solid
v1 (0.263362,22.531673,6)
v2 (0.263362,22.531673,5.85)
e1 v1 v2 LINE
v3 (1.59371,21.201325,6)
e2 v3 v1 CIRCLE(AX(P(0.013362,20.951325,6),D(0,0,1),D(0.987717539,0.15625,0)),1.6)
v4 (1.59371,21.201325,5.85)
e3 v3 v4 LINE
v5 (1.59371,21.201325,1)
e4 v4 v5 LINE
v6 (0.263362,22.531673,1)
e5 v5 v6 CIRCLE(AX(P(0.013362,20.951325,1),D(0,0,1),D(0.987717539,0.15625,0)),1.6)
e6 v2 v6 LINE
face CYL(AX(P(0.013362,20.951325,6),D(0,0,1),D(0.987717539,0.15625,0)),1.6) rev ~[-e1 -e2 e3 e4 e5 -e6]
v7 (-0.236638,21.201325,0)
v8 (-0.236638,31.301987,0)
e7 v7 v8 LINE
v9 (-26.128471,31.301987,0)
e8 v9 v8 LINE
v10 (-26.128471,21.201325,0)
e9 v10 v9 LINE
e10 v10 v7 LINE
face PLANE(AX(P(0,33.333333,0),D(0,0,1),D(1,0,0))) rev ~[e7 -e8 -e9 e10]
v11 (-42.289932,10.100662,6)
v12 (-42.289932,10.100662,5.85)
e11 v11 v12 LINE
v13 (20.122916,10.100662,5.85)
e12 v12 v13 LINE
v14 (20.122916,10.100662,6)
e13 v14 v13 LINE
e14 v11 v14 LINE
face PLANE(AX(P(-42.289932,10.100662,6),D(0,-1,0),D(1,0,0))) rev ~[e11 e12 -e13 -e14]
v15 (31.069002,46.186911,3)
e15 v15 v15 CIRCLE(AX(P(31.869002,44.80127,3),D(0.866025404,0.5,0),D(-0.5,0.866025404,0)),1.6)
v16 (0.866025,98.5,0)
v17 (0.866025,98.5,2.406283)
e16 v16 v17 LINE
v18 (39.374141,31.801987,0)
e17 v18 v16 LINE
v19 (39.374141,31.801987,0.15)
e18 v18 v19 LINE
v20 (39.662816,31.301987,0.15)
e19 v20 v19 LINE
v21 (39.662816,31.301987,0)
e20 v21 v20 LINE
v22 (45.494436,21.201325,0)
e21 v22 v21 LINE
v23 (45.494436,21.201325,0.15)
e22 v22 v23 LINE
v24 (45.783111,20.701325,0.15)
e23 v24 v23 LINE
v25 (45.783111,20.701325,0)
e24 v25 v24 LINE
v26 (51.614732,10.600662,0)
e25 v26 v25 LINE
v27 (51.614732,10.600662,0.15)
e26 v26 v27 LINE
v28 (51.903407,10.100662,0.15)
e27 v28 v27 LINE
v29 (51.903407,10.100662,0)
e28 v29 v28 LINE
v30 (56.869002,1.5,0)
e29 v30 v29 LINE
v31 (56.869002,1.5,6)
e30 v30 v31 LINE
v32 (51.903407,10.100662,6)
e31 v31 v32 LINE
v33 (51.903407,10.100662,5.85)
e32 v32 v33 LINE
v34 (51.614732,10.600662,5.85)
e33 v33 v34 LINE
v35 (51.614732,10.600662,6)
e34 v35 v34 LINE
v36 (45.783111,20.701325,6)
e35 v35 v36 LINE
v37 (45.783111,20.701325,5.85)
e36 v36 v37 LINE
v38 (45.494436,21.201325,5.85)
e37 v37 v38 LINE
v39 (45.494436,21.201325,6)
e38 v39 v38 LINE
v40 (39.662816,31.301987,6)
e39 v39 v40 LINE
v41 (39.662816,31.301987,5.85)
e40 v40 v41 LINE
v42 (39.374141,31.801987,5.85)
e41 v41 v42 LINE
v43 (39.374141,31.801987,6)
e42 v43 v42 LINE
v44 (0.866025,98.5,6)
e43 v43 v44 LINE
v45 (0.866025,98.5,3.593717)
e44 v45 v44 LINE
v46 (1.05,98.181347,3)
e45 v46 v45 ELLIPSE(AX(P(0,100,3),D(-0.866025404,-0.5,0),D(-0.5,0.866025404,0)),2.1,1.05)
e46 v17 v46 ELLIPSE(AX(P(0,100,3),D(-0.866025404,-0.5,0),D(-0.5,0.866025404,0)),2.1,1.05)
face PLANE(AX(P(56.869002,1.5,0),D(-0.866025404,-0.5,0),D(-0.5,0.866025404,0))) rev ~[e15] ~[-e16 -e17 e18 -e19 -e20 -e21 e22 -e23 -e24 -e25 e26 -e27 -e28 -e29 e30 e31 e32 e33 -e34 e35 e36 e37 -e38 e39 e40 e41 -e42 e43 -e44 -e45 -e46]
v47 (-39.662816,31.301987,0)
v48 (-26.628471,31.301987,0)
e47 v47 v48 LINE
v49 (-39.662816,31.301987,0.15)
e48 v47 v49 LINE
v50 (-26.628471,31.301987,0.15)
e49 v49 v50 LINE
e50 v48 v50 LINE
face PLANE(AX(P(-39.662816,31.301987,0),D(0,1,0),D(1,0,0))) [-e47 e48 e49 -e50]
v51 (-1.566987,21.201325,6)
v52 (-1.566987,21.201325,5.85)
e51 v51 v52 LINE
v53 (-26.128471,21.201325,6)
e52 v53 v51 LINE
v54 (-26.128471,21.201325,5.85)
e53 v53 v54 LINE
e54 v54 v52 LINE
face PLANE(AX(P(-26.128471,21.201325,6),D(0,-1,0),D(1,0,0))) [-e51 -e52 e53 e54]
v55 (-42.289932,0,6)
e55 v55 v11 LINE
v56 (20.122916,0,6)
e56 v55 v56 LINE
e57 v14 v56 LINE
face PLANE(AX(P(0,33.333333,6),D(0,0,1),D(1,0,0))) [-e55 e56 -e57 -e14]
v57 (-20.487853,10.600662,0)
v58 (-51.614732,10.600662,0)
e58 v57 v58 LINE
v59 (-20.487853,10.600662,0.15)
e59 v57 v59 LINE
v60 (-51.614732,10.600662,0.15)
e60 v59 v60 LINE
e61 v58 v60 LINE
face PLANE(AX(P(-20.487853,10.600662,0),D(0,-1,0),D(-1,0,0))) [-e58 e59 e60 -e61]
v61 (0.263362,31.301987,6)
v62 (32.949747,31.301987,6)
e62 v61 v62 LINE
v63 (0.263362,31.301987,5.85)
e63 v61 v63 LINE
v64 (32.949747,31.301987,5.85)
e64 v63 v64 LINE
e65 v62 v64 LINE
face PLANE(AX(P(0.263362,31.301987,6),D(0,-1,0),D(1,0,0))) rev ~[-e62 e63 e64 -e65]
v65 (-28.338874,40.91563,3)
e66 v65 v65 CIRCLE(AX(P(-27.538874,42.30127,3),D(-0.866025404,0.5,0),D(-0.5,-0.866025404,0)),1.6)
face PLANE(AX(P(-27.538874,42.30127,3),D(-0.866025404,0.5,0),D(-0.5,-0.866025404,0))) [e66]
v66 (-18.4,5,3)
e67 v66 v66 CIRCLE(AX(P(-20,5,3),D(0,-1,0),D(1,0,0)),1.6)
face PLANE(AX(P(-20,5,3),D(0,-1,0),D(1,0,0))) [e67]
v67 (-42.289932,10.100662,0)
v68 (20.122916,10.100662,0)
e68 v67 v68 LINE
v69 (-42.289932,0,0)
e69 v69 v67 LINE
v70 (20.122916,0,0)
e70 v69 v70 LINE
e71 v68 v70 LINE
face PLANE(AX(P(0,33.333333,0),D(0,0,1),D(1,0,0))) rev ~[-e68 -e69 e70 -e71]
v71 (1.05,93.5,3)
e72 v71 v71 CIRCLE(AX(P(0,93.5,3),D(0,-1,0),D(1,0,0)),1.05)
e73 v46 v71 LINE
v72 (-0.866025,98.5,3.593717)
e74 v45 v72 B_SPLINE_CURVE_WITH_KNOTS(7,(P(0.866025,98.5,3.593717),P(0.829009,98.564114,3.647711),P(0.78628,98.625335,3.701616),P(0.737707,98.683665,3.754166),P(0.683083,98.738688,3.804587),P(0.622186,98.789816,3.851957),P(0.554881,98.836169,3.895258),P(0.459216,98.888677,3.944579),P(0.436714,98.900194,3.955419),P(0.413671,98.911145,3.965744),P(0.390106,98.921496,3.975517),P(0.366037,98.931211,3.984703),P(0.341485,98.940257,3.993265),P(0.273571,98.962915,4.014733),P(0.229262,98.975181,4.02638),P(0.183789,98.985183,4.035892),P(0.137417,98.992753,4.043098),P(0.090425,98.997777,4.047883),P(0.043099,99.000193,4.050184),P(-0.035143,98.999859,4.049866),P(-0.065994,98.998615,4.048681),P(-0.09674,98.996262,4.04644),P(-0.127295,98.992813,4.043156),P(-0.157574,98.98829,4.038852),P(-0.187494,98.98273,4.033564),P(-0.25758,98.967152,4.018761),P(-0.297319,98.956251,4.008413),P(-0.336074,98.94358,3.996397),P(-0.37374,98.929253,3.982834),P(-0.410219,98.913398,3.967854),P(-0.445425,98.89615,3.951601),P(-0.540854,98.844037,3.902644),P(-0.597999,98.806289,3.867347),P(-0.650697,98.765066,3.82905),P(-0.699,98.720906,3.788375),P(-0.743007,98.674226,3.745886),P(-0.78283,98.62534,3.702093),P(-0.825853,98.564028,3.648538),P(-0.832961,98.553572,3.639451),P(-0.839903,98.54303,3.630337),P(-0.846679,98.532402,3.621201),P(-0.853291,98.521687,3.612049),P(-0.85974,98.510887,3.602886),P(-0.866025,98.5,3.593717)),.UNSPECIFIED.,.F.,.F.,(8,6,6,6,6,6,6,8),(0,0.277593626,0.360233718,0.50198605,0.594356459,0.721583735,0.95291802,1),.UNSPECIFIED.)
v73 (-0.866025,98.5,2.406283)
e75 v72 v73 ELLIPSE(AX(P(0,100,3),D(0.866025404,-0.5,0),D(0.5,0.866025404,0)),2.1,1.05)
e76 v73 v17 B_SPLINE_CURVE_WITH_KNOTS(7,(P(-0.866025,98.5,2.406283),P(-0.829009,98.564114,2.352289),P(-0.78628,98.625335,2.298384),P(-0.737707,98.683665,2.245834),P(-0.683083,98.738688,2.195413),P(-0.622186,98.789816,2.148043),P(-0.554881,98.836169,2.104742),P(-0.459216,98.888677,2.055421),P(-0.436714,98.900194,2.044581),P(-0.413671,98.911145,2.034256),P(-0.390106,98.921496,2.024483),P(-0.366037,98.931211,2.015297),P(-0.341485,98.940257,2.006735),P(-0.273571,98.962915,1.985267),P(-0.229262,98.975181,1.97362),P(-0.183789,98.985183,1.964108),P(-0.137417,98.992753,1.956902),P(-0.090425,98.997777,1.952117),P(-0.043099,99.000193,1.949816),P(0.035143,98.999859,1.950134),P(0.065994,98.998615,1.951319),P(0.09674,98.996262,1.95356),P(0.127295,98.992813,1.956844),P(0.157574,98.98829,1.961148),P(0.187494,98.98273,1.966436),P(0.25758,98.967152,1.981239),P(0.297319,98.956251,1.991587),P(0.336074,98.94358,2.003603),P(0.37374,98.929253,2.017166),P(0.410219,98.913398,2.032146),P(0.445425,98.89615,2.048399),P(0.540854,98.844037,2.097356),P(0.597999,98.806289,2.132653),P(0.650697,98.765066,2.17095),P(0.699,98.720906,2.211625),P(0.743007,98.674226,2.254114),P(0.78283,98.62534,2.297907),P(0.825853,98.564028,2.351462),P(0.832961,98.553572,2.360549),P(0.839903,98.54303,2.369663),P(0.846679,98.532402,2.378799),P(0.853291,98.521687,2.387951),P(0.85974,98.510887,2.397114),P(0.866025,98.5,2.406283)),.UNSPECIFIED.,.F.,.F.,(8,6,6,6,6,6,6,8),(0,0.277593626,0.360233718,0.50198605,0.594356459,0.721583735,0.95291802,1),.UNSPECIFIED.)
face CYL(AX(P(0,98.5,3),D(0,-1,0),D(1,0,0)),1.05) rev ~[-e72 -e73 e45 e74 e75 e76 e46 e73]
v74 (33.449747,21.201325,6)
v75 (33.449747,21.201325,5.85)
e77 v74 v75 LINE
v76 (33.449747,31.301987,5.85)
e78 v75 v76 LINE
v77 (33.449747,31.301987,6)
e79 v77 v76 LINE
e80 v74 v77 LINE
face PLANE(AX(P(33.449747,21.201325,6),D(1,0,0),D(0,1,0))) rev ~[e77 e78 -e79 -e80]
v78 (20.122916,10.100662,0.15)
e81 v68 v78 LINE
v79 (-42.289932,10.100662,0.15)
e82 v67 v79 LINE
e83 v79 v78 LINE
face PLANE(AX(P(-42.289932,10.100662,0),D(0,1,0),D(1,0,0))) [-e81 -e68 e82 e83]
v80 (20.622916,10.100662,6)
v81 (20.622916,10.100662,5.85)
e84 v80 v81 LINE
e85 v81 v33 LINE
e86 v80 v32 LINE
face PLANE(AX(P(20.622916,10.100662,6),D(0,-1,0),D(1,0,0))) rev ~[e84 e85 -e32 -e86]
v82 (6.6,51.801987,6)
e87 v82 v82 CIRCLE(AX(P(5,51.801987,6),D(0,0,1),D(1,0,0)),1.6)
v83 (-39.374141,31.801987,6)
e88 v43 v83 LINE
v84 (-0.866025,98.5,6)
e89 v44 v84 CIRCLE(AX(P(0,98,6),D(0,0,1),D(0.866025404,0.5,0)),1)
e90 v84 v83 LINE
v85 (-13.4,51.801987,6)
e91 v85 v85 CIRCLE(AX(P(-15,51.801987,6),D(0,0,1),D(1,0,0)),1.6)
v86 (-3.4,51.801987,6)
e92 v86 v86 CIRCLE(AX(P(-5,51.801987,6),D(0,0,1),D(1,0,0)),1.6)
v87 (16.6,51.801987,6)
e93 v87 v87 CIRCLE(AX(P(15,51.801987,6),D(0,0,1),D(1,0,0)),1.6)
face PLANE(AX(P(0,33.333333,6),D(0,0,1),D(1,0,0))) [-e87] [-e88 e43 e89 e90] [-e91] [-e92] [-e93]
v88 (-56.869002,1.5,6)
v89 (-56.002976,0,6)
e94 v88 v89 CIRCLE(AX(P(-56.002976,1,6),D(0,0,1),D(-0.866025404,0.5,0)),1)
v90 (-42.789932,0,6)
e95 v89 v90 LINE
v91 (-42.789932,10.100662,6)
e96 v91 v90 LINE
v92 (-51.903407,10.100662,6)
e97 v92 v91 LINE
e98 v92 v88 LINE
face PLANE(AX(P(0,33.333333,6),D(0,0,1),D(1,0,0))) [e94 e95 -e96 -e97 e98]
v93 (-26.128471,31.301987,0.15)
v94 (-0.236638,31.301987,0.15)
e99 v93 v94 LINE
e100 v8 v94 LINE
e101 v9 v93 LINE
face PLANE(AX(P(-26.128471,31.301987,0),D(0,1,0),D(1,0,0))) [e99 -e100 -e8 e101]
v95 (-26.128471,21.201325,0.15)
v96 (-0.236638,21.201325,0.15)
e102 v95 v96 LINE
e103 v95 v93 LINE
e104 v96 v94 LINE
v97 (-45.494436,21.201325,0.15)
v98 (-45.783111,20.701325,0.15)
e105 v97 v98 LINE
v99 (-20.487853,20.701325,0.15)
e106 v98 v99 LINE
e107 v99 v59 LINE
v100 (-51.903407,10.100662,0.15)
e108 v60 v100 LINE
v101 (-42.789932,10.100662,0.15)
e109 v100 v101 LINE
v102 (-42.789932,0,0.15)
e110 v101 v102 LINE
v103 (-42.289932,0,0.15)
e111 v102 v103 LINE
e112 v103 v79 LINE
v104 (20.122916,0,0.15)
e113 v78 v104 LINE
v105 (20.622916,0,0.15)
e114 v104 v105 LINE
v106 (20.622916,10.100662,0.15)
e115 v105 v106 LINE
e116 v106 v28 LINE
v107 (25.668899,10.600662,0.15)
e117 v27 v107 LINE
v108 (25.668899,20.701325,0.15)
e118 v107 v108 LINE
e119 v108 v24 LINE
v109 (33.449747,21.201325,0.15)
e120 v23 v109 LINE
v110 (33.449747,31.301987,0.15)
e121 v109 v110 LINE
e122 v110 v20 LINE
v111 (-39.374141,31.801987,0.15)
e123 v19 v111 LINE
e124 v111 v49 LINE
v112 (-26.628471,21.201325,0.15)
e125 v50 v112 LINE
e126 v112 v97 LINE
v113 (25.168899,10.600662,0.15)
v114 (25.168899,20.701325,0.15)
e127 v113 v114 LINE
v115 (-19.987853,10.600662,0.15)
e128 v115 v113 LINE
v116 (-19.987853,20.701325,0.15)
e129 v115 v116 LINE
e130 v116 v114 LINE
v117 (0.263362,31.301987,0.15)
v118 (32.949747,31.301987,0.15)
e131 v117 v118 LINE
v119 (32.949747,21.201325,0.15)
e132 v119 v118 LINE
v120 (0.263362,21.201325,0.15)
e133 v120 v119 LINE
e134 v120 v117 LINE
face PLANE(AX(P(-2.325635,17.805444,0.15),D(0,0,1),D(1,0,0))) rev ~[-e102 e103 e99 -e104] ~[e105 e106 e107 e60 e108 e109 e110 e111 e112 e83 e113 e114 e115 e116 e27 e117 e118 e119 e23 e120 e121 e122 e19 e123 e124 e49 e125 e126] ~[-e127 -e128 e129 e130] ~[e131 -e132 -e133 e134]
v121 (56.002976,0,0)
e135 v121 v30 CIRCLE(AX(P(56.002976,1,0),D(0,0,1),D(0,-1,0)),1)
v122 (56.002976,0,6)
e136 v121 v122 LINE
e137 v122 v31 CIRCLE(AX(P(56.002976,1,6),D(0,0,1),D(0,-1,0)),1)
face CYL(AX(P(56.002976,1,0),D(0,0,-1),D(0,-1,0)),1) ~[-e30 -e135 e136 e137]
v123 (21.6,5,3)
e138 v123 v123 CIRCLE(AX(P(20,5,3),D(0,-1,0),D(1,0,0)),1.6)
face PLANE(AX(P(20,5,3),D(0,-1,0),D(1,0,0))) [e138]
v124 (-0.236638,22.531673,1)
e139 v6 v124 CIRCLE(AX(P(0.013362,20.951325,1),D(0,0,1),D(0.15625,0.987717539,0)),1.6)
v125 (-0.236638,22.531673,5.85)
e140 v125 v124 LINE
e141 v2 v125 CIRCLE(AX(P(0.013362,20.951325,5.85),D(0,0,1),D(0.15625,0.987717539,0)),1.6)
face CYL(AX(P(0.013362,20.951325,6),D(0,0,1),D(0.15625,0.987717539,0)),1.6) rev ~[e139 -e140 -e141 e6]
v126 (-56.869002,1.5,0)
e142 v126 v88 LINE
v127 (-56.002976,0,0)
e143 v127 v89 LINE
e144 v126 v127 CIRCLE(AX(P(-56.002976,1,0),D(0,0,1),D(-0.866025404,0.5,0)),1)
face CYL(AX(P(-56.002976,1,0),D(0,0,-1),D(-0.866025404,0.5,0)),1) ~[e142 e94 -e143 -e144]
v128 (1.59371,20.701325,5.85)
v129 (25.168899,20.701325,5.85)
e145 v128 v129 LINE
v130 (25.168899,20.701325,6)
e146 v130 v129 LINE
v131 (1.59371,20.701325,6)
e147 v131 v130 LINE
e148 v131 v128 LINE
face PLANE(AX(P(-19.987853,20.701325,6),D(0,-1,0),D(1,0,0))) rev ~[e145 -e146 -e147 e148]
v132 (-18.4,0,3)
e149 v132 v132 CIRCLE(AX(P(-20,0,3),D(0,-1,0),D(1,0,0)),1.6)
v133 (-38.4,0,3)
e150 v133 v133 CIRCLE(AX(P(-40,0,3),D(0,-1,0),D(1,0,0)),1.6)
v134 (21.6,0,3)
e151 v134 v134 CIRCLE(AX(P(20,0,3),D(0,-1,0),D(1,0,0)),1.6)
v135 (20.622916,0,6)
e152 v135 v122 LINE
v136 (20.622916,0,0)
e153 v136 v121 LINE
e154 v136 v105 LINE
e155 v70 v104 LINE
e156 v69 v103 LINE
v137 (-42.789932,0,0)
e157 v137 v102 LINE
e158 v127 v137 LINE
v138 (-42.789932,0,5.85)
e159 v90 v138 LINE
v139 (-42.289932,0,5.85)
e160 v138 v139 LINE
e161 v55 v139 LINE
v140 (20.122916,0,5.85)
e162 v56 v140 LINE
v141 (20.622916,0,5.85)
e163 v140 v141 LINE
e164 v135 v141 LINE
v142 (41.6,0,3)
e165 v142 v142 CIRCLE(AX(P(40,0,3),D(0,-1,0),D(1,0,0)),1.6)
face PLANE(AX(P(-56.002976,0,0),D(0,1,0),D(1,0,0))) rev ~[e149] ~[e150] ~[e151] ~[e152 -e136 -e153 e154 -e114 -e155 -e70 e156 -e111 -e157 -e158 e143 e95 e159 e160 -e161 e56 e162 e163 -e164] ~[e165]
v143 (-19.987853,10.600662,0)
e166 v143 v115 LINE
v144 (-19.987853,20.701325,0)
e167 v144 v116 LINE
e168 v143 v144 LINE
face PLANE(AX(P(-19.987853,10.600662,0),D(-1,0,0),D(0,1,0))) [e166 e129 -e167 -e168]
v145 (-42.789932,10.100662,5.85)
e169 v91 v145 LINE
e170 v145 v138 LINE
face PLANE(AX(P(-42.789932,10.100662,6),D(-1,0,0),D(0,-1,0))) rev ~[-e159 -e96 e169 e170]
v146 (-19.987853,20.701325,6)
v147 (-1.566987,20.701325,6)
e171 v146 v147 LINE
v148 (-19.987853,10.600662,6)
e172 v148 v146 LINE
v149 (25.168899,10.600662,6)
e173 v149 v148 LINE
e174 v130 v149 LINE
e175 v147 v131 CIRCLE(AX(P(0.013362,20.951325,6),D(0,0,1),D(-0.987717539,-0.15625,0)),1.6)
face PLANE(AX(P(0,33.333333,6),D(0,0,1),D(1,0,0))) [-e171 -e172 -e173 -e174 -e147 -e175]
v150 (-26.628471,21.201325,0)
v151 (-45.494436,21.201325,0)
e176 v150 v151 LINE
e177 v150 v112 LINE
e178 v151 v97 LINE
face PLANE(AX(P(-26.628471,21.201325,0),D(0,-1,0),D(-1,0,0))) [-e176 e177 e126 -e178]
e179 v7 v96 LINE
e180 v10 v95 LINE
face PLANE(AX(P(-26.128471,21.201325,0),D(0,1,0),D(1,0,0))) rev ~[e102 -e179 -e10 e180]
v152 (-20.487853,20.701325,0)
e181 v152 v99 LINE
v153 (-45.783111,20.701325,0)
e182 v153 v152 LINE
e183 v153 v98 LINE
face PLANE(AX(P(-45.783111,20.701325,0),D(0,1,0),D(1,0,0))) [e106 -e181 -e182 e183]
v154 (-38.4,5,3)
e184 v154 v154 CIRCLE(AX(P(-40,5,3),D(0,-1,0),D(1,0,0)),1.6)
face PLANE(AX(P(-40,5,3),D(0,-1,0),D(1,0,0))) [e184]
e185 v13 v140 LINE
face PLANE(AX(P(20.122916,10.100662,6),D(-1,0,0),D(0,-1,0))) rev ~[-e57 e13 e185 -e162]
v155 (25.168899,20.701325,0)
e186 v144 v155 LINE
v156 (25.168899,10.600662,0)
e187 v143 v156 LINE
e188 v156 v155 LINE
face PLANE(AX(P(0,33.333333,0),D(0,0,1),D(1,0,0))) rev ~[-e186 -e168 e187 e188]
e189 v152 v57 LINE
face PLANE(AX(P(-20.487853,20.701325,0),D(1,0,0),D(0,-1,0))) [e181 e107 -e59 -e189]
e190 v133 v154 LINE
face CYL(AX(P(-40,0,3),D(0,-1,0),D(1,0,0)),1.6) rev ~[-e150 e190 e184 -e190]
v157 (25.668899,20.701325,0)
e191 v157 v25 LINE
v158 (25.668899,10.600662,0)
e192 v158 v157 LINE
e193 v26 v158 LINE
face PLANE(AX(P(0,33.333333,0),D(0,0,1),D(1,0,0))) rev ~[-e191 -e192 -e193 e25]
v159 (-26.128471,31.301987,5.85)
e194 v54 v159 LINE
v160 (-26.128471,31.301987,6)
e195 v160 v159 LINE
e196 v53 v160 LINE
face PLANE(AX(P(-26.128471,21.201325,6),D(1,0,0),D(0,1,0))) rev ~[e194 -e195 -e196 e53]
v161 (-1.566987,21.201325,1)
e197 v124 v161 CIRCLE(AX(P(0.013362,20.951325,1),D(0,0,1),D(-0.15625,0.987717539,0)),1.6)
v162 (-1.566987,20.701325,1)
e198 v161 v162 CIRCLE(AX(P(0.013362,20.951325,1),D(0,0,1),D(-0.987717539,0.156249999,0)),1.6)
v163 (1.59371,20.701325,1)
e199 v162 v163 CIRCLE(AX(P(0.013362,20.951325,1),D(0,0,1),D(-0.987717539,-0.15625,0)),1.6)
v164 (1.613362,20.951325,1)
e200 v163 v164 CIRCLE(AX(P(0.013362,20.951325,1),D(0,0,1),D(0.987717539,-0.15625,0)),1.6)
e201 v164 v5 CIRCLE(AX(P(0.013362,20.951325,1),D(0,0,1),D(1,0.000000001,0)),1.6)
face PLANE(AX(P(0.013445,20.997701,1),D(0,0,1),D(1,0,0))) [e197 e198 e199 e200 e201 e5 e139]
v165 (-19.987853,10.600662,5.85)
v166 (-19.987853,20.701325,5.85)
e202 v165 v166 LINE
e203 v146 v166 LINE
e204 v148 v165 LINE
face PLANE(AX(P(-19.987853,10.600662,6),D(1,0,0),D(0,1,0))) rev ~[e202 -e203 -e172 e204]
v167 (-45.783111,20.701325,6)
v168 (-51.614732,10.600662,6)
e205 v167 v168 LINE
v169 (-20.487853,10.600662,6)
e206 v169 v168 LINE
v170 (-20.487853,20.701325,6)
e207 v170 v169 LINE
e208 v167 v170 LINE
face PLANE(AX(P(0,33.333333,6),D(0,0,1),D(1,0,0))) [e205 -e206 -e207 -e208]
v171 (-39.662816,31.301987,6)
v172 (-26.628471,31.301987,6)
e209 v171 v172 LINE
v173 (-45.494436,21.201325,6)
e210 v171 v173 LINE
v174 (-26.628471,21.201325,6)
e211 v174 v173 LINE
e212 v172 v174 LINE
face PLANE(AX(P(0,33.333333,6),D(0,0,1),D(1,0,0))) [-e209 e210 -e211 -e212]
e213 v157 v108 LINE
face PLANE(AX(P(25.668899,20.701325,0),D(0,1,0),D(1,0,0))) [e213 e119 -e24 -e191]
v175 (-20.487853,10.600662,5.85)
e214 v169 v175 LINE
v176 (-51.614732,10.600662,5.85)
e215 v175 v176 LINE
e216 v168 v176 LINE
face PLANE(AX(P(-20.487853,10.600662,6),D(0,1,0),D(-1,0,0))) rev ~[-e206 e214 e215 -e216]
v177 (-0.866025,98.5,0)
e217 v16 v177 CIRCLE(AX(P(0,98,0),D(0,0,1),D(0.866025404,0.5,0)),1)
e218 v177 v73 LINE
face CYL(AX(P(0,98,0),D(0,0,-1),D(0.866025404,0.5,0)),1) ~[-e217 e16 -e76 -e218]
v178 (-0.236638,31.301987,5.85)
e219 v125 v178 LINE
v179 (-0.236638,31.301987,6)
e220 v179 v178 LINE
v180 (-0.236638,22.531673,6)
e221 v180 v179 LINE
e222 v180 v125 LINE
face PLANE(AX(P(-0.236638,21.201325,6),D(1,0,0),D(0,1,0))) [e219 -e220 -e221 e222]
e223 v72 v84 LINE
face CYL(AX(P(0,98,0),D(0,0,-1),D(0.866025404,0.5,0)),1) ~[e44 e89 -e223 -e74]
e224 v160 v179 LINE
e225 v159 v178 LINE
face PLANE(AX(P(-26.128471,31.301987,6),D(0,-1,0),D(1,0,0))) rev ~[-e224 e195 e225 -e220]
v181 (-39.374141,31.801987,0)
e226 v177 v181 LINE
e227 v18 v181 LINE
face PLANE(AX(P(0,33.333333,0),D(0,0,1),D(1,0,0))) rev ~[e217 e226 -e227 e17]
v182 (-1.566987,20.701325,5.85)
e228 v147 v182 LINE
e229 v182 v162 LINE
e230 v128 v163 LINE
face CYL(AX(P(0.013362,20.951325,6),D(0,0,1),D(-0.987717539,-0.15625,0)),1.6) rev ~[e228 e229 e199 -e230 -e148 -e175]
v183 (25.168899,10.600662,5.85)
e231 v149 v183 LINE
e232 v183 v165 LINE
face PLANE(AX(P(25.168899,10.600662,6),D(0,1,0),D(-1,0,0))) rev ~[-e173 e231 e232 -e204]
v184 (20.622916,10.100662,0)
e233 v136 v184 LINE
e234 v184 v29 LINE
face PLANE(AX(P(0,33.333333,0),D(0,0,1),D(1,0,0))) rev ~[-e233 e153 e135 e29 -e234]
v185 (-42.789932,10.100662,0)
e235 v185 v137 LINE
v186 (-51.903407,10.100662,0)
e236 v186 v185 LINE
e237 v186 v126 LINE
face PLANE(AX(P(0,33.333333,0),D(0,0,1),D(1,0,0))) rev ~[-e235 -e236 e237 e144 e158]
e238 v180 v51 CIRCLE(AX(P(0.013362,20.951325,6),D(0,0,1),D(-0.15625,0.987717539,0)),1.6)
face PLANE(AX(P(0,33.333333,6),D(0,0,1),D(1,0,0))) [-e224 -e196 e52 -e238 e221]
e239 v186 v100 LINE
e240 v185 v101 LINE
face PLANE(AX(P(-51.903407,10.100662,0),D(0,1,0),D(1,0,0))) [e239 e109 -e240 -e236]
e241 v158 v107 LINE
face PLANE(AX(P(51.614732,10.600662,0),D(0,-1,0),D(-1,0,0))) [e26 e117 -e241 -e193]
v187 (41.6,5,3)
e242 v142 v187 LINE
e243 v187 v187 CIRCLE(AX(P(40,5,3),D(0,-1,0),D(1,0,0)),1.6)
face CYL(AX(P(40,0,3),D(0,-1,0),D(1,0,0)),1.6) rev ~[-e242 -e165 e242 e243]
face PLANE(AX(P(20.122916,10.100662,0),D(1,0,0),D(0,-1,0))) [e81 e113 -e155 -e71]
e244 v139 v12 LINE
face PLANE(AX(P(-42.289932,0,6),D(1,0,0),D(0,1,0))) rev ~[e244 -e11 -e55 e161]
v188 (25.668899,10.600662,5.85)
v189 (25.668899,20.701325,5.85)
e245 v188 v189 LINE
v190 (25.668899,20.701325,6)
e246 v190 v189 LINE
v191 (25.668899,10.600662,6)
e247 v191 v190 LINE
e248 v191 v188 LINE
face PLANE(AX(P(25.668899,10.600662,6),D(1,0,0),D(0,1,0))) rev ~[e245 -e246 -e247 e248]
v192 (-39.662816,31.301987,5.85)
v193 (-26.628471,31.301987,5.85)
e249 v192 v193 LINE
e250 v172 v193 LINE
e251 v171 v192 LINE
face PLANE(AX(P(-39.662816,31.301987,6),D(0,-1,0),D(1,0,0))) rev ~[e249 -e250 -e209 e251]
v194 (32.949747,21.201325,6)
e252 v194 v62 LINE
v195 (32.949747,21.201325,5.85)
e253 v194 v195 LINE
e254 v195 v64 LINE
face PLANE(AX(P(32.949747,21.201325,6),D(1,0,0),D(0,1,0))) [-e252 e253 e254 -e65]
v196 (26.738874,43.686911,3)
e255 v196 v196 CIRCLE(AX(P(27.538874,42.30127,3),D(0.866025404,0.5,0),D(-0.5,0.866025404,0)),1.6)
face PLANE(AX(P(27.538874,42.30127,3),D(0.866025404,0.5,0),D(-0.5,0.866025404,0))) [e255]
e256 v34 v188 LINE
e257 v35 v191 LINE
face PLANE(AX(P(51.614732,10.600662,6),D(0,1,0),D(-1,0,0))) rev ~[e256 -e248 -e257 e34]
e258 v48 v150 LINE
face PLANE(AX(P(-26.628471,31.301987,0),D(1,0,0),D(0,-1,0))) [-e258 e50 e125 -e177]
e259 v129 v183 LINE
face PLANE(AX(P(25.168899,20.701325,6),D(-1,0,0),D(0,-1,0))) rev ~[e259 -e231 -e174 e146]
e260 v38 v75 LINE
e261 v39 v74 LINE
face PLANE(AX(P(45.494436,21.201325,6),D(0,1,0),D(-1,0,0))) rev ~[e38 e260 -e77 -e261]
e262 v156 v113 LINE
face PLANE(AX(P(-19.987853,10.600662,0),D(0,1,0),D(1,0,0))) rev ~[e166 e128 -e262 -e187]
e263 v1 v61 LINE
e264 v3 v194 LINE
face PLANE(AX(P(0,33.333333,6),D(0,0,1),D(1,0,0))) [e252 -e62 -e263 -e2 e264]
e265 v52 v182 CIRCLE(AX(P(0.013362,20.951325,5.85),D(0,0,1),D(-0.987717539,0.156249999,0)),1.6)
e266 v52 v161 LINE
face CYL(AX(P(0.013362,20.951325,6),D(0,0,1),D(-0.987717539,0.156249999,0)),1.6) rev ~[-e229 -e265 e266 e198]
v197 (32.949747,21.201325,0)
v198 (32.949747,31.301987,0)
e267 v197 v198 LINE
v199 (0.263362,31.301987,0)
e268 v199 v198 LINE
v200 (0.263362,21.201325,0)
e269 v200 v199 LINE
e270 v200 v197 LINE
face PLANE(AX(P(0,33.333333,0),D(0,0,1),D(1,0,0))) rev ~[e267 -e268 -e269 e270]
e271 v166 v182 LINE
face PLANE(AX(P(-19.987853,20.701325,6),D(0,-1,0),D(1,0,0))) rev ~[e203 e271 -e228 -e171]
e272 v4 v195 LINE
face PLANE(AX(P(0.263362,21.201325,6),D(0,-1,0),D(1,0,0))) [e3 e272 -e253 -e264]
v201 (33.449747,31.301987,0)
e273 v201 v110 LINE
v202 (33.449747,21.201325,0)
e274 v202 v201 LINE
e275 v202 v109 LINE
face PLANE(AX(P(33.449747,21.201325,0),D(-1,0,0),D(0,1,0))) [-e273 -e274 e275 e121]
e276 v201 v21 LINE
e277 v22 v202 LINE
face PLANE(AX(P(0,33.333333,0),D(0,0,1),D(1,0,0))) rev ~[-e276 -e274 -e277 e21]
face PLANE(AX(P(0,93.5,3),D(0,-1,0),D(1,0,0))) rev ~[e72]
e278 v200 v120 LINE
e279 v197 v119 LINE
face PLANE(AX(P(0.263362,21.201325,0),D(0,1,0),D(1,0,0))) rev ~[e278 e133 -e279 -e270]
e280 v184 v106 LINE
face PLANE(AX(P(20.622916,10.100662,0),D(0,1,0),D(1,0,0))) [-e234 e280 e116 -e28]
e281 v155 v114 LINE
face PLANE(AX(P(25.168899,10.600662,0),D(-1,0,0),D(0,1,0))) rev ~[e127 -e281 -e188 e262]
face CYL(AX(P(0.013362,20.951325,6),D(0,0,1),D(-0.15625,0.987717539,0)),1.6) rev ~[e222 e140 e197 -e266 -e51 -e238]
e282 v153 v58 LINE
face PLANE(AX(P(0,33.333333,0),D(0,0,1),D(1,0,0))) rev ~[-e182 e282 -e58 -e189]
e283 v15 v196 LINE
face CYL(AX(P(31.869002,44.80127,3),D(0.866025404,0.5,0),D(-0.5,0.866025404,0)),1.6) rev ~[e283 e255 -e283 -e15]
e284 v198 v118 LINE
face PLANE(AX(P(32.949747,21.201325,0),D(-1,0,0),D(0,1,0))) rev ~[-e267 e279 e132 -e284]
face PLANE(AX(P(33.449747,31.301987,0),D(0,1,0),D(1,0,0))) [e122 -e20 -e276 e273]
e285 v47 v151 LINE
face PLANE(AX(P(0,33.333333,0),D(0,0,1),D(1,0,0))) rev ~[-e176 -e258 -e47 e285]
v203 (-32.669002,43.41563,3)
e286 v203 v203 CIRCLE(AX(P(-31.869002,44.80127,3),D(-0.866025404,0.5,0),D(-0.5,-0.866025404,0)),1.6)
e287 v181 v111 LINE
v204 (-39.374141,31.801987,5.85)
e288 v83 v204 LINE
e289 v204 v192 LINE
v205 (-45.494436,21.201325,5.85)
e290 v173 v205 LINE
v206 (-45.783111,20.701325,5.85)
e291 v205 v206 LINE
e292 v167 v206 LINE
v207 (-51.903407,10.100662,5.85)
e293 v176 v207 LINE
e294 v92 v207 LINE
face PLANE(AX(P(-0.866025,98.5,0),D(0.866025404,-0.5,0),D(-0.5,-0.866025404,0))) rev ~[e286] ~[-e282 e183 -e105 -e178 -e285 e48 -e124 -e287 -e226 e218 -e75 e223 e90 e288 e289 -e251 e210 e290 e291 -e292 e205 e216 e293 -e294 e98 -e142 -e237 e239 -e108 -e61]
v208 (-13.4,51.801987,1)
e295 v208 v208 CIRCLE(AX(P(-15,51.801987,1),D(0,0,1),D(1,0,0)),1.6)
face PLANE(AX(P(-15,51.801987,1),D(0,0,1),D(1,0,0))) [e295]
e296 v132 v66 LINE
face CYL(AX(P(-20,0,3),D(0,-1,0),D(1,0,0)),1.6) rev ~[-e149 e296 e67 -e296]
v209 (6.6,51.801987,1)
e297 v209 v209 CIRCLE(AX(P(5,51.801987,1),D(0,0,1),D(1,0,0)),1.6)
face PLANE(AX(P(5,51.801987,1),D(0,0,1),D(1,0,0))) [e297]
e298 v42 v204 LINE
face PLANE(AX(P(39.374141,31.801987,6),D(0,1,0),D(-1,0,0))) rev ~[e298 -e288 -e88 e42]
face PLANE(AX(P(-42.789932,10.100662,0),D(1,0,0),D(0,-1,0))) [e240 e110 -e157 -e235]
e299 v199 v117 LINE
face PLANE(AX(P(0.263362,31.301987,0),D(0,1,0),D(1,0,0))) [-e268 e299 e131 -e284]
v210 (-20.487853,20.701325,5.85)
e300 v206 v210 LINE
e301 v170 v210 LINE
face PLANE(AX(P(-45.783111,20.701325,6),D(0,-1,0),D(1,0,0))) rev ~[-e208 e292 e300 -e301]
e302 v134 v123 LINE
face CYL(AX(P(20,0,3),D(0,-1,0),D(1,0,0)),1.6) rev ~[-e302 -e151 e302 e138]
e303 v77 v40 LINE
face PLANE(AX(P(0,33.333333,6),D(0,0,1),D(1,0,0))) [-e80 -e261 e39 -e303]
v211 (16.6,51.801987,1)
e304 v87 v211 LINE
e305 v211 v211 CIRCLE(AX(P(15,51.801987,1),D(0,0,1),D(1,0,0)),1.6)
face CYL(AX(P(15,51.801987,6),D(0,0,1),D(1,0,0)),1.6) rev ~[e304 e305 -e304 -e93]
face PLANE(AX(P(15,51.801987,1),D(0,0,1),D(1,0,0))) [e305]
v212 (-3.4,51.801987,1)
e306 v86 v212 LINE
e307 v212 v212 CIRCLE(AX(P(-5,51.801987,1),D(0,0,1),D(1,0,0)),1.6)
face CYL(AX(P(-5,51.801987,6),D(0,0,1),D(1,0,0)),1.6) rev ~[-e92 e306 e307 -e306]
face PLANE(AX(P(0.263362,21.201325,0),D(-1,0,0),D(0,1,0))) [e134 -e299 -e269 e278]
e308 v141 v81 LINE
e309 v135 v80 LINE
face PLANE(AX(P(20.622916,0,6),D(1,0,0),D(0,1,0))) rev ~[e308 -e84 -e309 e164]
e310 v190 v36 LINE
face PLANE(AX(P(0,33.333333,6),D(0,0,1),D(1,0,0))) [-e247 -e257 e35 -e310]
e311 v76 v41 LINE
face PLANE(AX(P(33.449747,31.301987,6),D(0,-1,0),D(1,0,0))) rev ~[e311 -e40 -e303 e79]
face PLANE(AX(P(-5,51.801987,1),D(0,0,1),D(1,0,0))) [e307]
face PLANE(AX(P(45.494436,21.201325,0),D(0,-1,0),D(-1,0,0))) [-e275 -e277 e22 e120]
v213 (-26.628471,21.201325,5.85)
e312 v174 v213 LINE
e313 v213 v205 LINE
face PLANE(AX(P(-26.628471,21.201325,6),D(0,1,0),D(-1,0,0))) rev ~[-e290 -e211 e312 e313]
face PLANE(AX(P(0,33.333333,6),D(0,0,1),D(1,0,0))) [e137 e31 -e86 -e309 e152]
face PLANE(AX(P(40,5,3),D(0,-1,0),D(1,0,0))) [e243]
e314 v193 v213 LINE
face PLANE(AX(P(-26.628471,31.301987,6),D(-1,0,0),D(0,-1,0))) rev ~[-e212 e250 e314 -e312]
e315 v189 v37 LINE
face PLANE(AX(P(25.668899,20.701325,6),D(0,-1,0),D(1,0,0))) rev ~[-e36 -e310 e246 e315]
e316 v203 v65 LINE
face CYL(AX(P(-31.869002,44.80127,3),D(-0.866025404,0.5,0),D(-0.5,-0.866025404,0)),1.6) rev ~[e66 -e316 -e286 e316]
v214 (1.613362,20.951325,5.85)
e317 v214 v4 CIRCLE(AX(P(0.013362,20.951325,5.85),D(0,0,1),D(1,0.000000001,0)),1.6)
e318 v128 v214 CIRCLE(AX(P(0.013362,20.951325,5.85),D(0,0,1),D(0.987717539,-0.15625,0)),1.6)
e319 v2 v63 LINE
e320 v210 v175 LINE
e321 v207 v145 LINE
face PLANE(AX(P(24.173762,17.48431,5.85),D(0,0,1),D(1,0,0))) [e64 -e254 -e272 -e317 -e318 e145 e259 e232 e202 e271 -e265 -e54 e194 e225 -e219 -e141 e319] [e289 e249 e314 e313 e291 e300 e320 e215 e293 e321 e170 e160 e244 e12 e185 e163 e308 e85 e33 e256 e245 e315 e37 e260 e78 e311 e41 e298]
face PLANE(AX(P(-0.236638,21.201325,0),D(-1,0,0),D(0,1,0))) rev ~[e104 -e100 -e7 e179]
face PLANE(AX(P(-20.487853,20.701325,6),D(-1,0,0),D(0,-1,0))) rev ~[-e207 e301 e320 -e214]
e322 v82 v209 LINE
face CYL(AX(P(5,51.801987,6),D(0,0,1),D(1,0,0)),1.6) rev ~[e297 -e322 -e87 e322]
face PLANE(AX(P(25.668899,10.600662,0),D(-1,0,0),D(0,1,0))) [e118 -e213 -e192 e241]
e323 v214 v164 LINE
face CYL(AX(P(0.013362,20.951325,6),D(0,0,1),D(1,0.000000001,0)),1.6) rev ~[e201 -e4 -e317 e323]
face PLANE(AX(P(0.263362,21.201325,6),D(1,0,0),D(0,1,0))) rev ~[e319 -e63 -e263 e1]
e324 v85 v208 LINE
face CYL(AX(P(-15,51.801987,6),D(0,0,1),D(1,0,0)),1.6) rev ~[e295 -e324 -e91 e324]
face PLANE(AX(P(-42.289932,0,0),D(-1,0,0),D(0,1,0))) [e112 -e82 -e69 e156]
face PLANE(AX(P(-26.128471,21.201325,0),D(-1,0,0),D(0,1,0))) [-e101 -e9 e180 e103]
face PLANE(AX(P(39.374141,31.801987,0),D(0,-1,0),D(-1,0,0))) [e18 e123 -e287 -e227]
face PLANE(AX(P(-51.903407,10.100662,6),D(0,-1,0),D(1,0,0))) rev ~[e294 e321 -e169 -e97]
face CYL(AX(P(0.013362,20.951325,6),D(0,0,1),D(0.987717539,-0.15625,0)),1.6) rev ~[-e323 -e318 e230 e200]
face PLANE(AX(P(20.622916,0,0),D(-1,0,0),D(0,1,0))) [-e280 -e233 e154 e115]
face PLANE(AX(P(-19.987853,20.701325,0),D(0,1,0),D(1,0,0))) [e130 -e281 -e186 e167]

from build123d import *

# Parameters (mm, degrees)
F3_DEPTH       = 6
F4_W           = 32.6863850343
F4_H           = 10.1006624426
F4_W_2         = 25.8918322674
F5_DEPTH       = 0.15
F6_W           = 25.8918322674
F6_H           = 10.1006624426
F6_W_2         = 45.1567518413
F6_W_3         = 32.6863850343
F7_DEPTH       = 0.15
F8_R           = 1.6
F9_DEPTH       = 5
F11_R          = 1.05
F12_DEPTH      = 5
F12_DEPTH_BACK = 0.501
F13_R          = 1.6
F14_DEPTH      = 5
F15_R          = 1.6
F16_DEPTH      = 5
F17_R          = 1.6
F18_DEPTH      = 5


with BuildPart() as f3:
    # F2 (on Top) → F3 (new body)
    with BuildSketch(Plane.XY):
        with BuildLine():
            ThreePointArc((0.8660254038, 98.5), (0, 99), (-0.8660254038, 98.5))
            Line((-0.8660254038, 98.5), (-56.8690015152, 1.5))
            ThreePointArc((-56.8690015152, 1.5), (-56.8690015152, 0.5), (-56.0029761114, 0))
            Line((-56.0029761114, 0), (56.0029761114, 0))
            ThreePointArc((56.0029761114, 0), (56.8690015152, 0.5), (56.8690015152, 1.5))
            Line((56.8690015152, 1.5), (0.8660254038, 98.5))
        make_face()
    extrude(amount=F3_DEPTH)

    # F4 (on face) → F5 (cut)
    with BuildSketch(Plane.XY.offset(6)):
        Polygon((39.6628161091, 31.3019873277), (39.3741409745, 31.8019873277), (0, 31.8019873277), (0, 20.7013248852), (25.1688986466, 20.7013248852), (25.1688986466, 10.6006624426), (0, 10.6006624426), (0, 10.1006624426), (20.1229155064, 10.1006624426), (20.1229155064, 0), (20.6229155064, 0), (20.6229155064, 10.1006624426), (51.9034067387, 10.1006624426), (51.6147316042, 10.6006624426), (25.6688986466, 10.6006624426), (25.6688986466, 20.7013248852), (45.7831114239, 20.7013248852), (45.4944362893, 21.2013248852), (33.4497465572, 21.2013248852), (33.4497465572, 31.3019873277), align=None)
        with Locations((16.60655404, 26.2516561065)):
            Rectangle(F4_W, F4_H, mode=Mode.SUBTRACT)
        Polygon((0, 20.7013248852), (0, 31.8019873277), (-39.3741409745, 31.8019873277), (-39.6628161091, 31.3019873277), (-26.6284707446, 31.3019873277), (-26.6284707446, 21.2013248852), (-45.4944362893, 21.2013248852), (-45.7831114239, 20.7013248852), (-20.4878531947, 20.7013248852), (-20.4878531947, 10.6006624426), (-51.6147316042, 10.6006624426), (-51.9034067387, 10.1006624426), (-42.7899323404, 10.1006624426), (-42.7899323404, 0), (-42.2899323404, 0), (-42.2899323404, 10.1006624426), (0, 10.1006624426), (0, 10.6006624426), (-19.9878531947, 10.6006624426), (-19.9878531947, 20.7013248852), align=None)
        with Locations((-13.1825546109, 26.2516561065)):
            Rectangle(F4_W_2, F4_H, mode=Mode.SUBTRACT)
    extrude(amount=-F5_DEPTH, mode=Mode.SUBTRACT)

    # F6 (on face) → F7 (cut)
    with BuildSketch(Plane.XY):
        Polygon((-51.9034067387, 10.1006624426), (-42.7899323404, 10.1006624426), (-42.7899323404, 0), (-42.2899323404, 0), (-42.2899323404, 10.1006624426), (20.1229155064, 10.1006624426), (20.1229155064, 0), (20.6229155064, 0), (20.6229155064, 10.1006624426), (51.9034067387, 10.1006624426), (51.6147316042, 10.6006624426), (25.6688986466, 10.6006624426), (25.6688986466, 20.7013248852), (45.7831114239, 20.7013248852), (45.4944362893, 21.2013248852), (33.4497465572, 21.2013248852), (33.4497465572, 31.3019873277), (39.6628161091, 31.3019873277), (39.3741409745, 31.8019873277), (-39.3741409745, 31.8019873277), (-39.6628161091, 31.3019873277), (-26.6284707446, 31.3019873277), (-26.6284707446, 21.2013248852), (-45.4944362893, 21.2013248852), (-45.7831114239, 20.7013248852), (-20.4878531947, 20.7013248852), (-20.4878531947, 10.6006624426), (-51.6147316042, 10.6006624426), align=None)
        with Locations((-13.1825546109, 26.2516561065)):
            Rectangle(F6_W, F6_H, mode=Mode.SUBTRACT)
        with Locations((2.5905227259, 15.6509936639)):
            Rectangle(F6_W_2, F6_H, mode=Mode.SUBTRACT)
        with Locations((16.60655404, 26.2516561065)):
            Rectangle(F6_W_3, F6_H, mode=Mode.SUBTRACT)
    extrude(amount=F7_DEPTH, mode=Mode.SUBTRACT)

    # F8 (on face) → F9 (cut)
    with BuildSketch(Plane.XY.offset(6)):
        with BuildLine():
            ThreePointArc((1.5937095858, 20.7013248852), (1.6084409724, 20.8259392813), (1.6133615229, 20.9513248852))
            ThreePointArc((1.6133615229, 20.9513248852), (1.6084409724, 21.076710489), (1.5937095858, 21.2013248852))
            ThreePointArc((1.5937095858, 21.2013248852), (1.1447323728, 22.0826957351), (0.2633615229, 22.5316729481))
            ThreePointArc((0.2633615229, 22.5316729481), (0.0133615229, 22.5513248852), (-0.2366384771, 22.5316729481))
            ThreePointArc((-0.2366384771, 22.5316729481), (-1.118009327, 22.0826957351), (-1.5669865401, 21.2013248852))
            ThreePointArc((-1.5669865401, 21.2013248852), (-1.5866384771, 20.9513248852), (-1.5669865401, 20.7013248852))
            ThreePointArc((-1.5669865401, 20.7013248852), (0.0133615229, 19.3513248852), (1.5937095858, 20.7013248852))
        make_face()
        with Locations((5, 51.8019873277)):
            Circle(F8_R)
        with Locations((-5, 51.8019873277)):
            Circle(F8_R)
        with Locations((15, 51.8019873277)):
            Circle(F8_R)
        with Locations((-15, 51.8019873277)):
            Circle(F8_R)
    extrude(amount=-F9_DEPTH, mode=Mode.SUBTRACT)

    # F11 (on 3pt) → F12 (cut, two sides)
    with BuildSketch(Plane.XZ.offset(-98.5)) as f12_sk:
        with Locations((0, 3)):
            Circle(F11_R)
    extrude(amount=F12_DEPTH, mode=Mode.SUBTRACT)
    extrude(f12_sk.sketch, amount=-F12_DEPTH_BACK, mode=Mode.SUBTRACT)

    # F13 (on face) → F14 (cut)
    with BuildSketch(Plane.XZ):
        with Locations((-40, 3)):
            Circle(F13_R)
        with Locations((-20, 3)):
            Circle(F13_R)
        with Locations((20, 3)):
            Circle(F13_R)
        with Locations((40, 3)):
            Circle(F13_R)
    extrude(amount=-F14_DEPTH, mode=Mode.SUBTRACT)

    # F15 (on face) → F16 (cut)
    with BuildSketch(Plane(origin=(43.3012701892, 25, 0), x_dir=(-0.5, 0.8660254038, 0), z_dir=(0.8660254038, 0.5, 0))):
        with Locations((22.8645373481, 3)):
            Circle(F15_R)
    extrude(amount=-F16_DEPTH, mode=Mode.SUBTRACT)

    # F17 (on face) → F18 (cut)
    with BuildSketch(Plane(origin=(-43.3012701892, 25, 0), x_dir=(-0.5, -0.8660254038, 0), z_dir=(-0.8660254038, 0.5, 0))):
        with Locations((-22.8645373481, 3)):
            Circle(F17_R)
    extrude(amount=-F18_DEPTH, mode=Mode.SUBTRACT)


solid = f3.part
